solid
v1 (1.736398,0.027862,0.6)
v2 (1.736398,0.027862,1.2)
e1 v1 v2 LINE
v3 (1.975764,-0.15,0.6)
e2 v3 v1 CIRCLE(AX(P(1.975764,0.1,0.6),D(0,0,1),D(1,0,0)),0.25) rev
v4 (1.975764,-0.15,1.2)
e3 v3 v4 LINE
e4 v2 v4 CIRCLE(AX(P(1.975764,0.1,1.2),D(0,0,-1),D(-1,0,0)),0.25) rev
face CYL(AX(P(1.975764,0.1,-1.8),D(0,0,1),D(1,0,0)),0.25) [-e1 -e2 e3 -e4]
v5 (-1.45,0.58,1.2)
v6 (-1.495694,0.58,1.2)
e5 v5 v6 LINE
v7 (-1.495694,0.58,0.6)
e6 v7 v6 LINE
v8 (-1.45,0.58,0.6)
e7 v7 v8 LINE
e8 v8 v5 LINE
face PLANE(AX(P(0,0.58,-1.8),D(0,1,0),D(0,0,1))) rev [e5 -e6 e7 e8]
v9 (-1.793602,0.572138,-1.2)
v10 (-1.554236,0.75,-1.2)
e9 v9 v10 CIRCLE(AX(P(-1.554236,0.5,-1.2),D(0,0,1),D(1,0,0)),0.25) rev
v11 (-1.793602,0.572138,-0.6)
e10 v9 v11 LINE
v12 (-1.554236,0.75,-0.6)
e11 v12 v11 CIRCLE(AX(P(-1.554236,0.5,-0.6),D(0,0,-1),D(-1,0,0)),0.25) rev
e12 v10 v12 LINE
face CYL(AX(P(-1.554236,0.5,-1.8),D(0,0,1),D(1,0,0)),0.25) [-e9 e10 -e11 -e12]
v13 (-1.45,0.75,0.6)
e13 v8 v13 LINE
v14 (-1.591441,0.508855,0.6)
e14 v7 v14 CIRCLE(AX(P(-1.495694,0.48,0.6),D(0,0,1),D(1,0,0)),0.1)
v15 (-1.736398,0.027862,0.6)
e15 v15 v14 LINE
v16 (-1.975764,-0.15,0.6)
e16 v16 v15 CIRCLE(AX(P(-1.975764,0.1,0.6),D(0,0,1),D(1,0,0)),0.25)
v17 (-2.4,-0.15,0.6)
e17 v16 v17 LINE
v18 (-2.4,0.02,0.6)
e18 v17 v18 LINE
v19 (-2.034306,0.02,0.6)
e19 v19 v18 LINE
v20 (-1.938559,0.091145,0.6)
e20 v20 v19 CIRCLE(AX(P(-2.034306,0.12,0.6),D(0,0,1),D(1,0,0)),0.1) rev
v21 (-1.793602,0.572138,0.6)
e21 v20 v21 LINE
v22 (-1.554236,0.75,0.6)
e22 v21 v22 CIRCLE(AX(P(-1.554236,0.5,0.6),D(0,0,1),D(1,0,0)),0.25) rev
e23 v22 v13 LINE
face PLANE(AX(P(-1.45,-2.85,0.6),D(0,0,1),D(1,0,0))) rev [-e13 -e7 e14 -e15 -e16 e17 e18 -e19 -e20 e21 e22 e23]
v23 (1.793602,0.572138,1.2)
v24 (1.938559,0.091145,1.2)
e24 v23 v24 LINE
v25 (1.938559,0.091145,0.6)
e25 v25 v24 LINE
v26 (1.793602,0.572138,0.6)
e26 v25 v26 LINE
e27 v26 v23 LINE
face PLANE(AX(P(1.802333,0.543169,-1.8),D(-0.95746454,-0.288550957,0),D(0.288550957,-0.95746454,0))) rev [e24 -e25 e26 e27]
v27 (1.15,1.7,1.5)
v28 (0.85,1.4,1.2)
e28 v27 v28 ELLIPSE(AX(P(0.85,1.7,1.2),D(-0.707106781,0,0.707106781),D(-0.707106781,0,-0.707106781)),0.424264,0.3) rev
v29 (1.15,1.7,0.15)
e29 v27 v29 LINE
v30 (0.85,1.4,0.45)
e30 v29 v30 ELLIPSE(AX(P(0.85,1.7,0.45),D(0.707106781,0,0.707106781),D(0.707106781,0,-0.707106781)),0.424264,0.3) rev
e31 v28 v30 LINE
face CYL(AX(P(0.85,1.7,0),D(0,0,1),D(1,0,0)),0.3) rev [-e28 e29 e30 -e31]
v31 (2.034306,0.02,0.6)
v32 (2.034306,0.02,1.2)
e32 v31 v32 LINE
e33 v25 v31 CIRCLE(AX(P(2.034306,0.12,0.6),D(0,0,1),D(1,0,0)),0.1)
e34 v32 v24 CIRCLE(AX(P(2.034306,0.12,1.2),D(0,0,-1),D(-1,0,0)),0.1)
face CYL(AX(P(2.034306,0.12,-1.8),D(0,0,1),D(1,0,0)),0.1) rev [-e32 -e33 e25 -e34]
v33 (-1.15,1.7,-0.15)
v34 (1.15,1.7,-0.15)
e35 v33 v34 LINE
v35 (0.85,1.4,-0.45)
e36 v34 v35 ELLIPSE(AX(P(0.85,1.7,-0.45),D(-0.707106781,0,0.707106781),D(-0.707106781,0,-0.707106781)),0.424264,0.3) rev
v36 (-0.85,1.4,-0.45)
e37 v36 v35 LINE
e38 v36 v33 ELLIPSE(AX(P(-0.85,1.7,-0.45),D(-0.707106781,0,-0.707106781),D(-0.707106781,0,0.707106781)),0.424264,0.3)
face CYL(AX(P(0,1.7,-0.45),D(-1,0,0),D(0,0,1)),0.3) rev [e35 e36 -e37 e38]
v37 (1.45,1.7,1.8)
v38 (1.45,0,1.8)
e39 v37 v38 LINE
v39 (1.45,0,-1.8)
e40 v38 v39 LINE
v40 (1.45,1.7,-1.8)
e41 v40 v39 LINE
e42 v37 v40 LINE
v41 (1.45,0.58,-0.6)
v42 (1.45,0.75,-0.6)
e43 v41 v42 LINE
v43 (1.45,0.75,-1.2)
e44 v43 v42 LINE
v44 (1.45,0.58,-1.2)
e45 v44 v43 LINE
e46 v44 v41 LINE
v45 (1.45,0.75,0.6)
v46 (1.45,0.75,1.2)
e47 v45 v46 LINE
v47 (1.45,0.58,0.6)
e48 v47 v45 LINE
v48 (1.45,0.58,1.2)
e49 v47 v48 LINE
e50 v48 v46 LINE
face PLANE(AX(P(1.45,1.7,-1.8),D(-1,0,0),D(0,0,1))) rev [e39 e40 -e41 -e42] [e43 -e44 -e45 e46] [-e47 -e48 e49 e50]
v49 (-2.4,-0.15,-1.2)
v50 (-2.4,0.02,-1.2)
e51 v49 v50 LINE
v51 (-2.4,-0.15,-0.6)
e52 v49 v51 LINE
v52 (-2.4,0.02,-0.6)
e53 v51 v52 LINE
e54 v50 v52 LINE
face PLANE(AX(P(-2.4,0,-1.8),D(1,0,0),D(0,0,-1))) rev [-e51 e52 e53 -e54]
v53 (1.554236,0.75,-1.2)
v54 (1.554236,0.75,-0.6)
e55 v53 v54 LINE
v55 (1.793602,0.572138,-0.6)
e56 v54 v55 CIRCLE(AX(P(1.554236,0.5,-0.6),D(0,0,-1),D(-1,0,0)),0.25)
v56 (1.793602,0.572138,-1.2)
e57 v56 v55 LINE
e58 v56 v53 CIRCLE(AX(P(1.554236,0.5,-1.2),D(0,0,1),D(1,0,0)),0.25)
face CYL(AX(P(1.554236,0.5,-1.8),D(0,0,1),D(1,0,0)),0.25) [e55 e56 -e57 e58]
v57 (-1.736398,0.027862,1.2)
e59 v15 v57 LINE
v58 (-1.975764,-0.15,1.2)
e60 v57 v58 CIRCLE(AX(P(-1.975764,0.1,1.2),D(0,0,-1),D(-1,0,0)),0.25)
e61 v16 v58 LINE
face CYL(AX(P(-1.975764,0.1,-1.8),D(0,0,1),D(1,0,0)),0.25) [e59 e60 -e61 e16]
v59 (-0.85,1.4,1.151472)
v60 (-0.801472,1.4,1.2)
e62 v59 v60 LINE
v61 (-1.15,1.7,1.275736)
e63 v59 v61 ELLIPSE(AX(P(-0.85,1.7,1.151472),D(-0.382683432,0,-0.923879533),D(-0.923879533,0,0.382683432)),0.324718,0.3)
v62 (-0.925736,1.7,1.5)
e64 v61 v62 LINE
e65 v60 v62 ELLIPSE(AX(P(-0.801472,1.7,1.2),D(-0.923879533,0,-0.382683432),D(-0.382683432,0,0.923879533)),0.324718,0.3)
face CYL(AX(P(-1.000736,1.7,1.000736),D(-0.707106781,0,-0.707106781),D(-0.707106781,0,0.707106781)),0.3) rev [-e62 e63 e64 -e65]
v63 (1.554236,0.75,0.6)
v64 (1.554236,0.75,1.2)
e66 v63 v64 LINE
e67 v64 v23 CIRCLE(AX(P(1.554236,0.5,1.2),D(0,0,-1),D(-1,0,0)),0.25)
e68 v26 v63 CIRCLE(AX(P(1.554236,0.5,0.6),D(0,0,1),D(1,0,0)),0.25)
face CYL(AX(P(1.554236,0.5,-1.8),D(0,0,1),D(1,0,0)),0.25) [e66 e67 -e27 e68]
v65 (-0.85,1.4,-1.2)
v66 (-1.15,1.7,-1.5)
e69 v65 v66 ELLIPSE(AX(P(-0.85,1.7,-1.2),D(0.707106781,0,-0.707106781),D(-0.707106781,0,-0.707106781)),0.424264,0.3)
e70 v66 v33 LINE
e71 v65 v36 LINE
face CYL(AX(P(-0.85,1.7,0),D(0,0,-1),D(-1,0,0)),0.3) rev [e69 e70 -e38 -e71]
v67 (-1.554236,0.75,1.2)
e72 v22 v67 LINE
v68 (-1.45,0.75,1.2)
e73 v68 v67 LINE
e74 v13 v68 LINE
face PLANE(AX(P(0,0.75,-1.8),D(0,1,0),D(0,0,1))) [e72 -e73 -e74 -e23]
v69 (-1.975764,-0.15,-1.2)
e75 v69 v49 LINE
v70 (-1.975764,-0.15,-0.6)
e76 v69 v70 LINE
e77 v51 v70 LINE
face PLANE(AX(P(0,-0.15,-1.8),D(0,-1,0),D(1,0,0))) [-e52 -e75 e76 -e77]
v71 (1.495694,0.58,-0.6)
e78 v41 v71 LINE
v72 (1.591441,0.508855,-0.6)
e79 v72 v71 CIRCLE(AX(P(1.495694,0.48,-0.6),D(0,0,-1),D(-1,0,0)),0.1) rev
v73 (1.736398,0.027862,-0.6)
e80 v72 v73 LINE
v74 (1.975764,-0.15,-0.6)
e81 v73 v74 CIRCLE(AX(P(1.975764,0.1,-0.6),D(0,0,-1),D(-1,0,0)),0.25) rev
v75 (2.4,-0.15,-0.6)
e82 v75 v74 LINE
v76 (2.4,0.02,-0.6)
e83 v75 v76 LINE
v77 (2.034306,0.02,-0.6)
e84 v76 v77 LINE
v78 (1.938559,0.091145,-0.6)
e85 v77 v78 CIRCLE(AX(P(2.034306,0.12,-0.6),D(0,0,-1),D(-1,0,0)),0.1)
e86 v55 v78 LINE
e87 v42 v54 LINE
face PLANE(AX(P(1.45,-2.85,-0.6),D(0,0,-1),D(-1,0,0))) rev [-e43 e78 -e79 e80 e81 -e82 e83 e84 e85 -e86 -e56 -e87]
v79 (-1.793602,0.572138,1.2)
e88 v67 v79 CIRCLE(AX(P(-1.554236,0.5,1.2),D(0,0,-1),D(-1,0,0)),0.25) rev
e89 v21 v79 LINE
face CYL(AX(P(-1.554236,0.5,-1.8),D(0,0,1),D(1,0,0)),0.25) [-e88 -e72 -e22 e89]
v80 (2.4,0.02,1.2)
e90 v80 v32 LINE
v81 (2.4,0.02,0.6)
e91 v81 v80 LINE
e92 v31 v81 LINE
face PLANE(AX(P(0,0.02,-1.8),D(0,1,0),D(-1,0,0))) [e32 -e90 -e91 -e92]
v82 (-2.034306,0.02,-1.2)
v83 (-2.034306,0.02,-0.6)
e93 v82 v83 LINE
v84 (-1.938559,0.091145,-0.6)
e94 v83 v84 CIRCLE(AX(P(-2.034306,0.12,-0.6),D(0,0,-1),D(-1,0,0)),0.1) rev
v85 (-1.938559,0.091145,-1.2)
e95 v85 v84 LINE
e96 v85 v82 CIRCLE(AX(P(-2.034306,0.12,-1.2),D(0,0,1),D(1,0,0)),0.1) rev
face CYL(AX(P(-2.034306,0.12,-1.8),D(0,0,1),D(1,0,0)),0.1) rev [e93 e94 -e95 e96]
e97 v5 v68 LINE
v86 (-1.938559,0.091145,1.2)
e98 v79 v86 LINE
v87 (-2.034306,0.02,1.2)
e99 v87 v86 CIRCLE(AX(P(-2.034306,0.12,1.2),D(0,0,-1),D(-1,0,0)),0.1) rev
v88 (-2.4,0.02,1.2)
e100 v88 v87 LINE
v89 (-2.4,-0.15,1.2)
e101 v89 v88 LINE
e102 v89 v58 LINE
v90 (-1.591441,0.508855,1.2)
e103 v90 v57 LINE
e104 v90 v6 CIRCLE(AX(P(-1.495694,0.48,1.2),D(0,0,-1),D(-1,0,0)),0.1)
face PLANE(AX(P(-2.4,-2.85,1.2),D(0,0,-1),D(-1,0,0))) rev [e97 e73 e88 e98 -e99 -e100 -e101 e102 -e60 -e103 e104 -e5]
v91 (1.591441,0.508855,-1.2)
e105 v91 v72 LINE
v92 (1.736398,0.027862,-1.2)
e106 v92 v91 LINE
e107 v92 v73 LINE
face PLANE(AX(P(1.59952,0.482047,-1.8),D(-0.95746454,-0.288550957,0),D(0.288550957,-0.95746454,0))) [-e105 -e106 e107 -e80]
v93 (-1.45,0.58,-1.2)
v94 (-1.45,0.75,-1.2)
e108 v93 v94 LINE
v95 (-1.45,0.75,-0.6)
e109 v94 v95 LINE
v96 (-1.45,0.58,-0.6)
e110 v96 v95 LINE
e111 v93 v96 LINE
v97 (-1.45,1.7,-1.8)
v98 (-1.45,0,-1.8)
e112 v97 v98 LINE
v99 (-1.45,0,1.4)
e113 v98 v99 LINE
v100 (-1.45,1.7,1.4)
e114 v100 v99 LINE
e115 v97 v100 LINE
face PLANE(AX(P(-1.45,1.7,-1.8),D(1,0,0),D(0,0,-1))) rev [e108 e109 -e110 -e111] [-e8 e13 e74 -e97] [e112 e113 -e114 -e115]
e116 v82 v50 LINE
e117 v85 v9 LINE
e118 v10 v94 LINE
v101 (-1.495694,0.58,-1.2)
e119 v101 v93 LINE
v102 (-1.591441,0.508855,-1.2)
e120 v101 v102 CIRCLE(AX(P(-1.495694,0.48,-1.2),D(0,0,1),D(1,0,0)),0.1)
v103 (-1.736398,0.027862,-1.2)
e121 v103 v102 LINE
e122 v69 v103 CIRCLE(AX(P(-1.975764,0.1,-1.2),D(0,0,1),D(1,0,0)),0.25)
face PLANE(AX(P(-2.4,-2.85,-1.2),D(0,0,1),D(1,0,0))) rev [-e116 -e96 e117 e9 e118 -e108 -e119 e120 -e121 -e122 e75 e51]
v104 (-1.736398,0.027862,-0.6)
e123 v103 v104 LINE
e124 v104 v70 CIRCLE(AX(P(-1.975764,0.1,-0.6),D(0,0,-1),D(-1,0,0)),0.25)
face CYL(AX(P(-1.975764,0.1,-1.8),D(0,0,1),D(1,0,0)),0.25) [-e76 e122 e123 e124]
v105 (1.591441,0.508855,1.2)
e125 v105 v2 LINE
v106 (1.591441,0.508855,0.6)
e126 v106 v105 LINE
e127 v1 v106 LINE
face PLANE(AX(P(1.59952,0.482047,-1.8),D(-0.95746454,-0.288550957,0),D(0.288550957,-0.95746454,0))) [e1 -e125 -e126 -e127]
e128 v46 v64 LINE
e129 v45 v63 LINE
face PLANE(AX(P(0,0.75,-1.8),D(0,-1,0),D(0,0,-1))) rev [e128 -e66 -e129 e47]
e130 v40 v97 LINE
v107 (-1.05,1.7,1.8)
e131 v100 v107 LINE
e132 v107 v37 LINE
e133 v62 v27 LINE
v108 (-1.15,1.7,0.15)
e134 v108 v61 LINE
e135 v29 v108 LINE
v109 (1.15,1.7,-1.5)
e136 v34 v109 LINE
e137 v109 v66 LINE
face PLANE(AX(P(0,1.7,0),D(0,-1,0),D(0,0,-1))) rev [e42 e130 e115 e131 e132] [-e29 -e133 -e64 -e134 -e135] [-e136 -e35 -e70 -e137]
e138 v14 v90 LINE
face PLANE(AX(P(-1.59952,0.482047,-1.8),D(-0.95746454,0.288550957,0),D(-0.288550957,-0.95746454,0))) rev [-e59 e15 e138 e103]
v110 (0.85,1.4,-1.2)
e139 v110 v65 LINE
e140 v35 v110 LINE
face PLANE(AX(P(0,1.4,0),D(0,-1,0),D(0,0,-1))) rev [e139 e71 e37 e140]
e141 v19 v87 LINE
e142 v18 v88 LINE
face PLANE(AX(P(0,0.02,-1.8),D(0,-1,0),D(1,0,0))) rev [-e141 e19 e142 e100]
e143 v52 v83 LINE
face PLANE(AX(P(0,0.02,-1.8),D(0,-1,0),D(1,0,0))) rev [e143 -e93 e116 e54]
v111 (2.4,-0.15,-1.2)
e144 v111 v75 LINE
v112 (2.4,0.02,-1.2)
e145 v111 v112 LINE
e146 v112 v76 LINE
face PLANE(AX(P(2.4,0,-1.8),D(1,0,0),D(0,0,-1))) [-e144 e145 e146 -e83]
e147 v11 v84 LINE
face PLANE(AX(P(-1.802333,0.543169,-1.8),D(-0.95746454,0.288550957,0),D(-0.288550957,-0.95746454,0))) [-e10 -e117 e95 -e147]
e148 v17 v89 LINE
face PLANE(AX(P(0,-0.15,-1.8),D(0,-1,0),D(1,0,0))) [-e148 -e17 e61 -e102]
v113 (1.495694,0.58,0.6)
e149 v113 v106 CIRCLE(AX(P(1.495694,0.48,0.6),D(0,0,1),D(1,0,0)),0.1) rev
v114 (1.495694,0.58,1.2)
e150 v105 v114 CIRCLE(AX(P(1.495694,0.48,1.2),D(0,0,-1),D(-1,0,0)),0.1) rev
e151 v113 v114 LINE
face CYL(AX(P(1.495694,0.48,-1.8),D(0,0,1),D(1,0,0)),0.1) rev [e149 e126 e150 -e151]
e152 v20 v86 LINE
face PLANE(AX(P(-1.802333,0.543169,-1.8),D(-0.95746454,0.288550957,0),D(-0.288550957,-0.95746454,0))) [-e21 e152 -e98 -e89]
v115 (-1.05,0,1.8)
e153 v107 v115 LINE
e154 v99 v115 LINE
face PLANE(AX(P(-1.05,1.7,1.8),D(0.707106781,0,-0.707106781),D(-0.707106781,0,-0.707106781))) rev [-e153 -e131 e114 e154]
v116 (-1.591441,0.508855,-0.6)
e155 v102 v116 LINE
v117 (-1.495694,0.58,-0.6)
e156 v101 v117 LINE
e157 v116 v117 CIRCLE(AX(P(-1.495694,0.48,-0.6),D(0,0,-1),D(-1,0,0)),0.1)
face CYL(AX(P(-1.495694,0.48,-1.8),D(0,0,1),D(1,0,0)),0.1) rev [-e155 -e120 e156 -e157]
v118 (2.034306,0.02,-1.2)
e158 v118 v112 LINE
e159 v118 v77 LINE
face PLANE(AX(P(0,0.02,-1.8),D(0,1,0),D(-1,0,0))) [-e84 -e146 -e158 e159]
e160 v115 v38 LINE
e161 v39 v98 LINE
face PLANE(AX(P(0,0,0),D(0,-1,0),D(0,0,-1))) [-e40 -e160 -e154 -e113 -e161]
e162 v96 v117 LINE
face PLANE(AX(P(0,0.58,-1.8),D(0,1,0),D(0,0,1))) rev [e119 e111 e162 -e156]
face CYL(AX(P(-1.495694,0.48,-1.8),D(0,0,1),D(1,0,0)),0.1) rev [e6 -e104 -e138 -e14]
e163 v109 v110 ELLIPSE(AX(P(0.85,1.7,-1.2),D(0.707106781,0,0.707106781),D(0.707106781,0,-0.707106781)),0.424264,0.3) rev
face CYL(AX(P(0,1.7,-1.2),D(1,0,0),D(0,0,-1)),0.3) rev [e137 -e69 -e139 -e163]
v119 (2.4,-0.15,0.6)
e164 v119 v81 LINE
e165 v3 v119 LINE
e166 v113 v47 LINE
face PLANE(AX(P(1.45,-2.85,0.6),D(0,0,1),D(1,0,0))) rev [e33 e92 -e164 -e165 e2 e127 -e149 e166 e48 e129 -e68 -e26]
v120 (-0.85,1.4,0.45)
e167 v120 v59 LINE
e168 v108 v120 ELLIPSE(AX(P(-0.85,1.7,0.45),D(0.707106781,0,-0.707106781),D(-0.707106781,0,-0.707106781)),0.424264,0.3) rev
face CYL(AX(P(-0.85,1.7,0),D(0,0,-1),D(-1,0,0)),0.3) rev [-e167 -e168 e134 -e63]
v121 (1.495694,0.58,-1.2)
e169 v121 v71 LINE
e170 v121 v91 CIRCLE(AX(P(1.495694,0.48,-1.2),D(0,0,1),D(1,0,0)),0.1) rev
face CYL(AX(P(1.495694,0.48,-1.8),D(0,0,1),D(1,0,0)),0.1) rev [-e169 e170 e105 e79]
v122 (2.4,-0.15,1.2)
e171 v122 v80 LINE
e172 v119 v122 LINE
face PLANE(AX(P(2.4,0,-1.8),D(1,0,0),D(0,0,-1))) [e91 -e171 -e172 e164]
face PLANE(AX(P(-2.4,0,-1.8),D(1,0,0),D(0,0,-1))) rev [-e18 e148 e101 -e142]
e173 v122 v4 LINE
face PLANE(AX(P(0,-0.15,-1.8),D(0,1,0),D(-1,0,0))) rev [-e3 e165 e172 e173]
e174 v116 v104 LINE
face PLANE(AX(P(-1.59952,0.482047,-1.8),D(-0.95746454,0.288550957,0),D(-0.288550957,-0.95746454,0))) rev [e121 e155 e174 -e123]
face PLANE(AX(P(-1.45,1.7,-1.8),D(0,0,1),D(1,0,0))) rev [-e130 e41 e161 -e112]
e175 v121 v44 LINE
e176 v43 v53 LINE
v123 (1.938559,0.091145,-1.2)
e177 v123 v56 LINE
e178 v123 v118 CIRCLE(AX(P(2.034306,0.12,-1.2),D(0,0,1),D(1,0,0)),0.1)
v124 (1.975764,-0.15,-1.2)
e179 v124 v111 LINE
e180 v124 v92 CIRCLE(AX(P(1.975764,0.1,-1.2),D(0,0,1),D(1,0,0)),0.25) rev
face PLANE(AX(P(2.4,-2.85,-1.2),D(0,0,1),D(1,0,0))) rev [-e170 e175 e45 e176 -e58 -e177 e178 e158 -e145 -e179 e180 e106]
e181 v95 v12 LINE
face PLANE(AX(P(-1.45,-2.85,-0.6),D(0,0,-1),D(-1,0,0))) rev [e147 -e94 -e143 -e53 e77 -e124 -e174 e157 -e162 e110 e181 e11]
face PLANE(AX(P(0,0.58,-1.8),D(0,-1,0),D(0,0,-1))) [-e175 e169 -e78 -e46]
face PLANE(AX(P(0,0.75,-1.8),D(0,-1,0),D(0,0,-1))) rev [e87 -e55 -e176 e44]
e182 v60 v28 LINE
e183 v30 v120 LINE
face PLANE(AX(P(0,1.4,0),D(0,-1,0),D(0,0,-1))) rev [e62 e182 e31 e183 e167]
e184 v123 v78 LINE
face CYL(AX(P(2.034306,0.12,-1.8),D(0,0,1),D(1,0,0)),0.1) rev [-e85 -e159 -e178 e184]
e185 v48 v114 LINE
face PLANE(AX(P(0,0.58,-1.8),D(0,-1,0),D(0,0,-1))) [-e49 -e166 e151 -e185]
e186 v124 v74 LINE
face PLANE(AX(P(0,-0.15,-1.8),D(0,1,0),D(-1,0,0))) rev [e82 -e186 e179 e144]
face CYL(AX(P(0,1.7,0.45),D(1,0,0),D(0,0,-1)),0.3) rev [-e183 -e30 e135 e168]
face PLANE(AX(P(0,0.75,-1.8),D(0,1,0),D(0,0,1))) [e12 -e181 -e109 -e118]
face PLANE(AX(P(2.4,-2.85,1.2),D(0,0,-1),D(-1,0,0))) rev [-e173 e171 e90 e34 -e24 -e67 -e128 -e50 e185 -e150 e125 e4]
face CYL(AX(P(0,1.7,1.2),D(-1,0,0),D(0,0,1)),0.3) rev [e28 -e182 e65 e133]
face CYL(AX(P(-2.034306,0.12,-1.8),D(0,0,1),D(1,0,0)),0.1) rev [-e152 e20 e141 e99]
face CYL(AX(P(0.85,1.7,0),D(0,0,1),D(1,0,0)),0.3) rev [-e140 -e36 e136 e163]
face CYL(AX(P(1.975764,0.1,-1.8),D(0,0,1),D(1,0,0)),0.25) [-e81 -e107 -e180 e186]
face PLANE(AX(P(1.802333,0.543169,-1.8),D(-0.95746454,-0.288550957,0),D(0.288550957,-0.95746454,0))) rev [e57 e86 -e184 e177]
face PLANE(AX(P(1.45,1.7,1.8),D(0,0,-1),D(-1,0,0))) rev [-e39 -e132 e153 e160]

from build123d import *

# Parameters (mm, degrees)
EXTRUDE_1_DEPTH     = 1.7
SKETCH_2_W          = 2.3
SKETCH_2_H          = 1.35
CUT_EXTRUDE_1_DEPTH = 0.3
FILLET_1_R          = 0.3
FILLET_2_R          = 0.3
EXTRUDE_2_DEPTH     = 3.6
SKETCH_4_W          = 0.95
SKETCH_4_H          = 0.6
SKETCH_4_H_2        = 1.2
CUT_EXTRUDE_2_DEPTH = 3.6


with BuildPart() as part:
    # Эскиз1 → Бобышка-Вытянуть1 (new body)
    with BuildSketch(Plane(origin=(0, 0, 0), x_dir=(1, 0, 0), z_dir=(0, 1, 0))):
        Polygon((1.45, -1.8), (-1.05, -1.8), (-1.45, -1.4), (-1.45, 1.8), (1.45, 1.8), align=None)
    extrude(amount=EXTRUDE_1_DEPTH)

    # Эскиз2 → Вырез-Вытянуть1 (cut)
    with BuildSketch(Plane(origin=(0, 1.7, 0), x_dir=(1, 0, 0), z_dir=(0, 1, 0))):
        with Locations((0, 0.825)):
            Rectangle(SKETCH_2_W, SKETCH_2_H)
        Polygon((-1.15, -1.275735931), (-0.925735931, -1.5), (1.15, -1.5), (1.15, -0.15), (-1.15, -0.15), align=None)
    extrude(amount=-CUT_EXTRUDE_1_DEPTH, mode=Mode.SUBTRACT)

    # Скругление1
    fillet_1_edges = [part.edges().sort_by_distance(p)[0] for p in [
        (0, 1.4, -0.15),
        (-1.15, 1.4, -0.825),
        (0, 1.4, -1.5),
        (1.15, 1.4, -0.825),
    ]]
    fillet(fillet_1_edges, radius=FILLET_1_R - 0.0001)  # a hair under: the kernel refuses the full size

    # Скругление2
    fillet_2_edges = [part.edges().sort_by_distance(p)[0] for p in [
        (0.112132034, 1.4, 1.5),
        (-1.037867966, 1.4, 1.387867966),
        (-1.15, 1.4, 0.712867966),
        (0, 1.4, 0.15),
        (1.15, 1.4, 0.825),
    ]]
    fillet(fillet_2_edges, radius=FILLET_2_R - 0.0001)  # a hair under: the kernel refuses the full size

    # Эскиз3 → Бобышка-Вытянуть2 (add)
    with BuildSketch(Plane.XY.offset(1.8)):
        with BuildLine():
            ThreePointArc((-2.034305524, 0.02), (-1.974662878, 0.039733227), (-1.93855907, 0.091144904))
            Line((-1.93855907, 0.091144904), (-1.793602325, 0.572137739))
            ThreePointArc((-1.793602325, 0.572137739), (-1.703342805, 0.700666932), (-1.55423619, 0.75))
            Line((-1.55423619, 0.75), (-1.45, 0.75))
            Line((-1.45, 0.75), (-1.45, 0.58))
            Line((-1.45, 0.58), (-1.495694476, 0.58))
            ThreePointArc((-1.495694476, 0.58), (-1.555337122, 0.560266773), (-1.59144093, 0.508855096))
            Line((-1.59144093, 0.508855096), (-1.736397675, 0.027862261))
            ThreePointArc((-1.736397675, 0.027862261), (-1.826657195, -0.100666932), (-1.97576381, -0.15))
            Line((-1.97576381, -0.15), (-2.4, -0.15))
            Line((-2.4, -0.15), (-2.4, 0.02))
            Line((-2.4, 0.02), (-2.034305524, 0.02))
        make_face()
        with BuildLine():
            ThreePointArc((1.495694476, 0.58), (1.555337122, 0.560266773), (1.59144093, 0.508855096))
            Line((1.59144093, 0.508855096), (1.736397675, 0.027862261))
            ThreePointArc((1.736397675, 0.027862261), (1.826657195, -0.100666932), (1.97576381, -0.15))
            Line((1.97576381, -0.15), (2.4, -0.15))
            Line((2.4, -0.15), (2.4, 0.02))
            Line((2.4, 0.02), (2.034305524, 0.02))
            ThreePointArc((2.034305524, 0.02), (1.974662878, 0.039733227), (1.93855907, 0.091144904))
            Line((1.93855907, 0.091144904), (1.793602325, 0.572137739))
            ThreePointArc((1.793602325, 0.572137739), (1.703342805, 0.700666932), (1.55423619, 0.75))
            Line((1.55423619, 0.75), (1.45, 0.75))
            Line((1.45, 0.75), (1.45, 0.58))
            Line((1.45, 0.58), (1.495694476, 0.58))
        make_face()
    extrude(amount=-EXTRUDE_2_DEPTH)

    # Эскиз4 → Вырез-Вытянуть2 (cut)
    with BuildSketch(Plane(origin=(0, 0.75, 0), x_dir=(1, 0, 0), z_dir=(0, 1, 0))):
        with Locations((1.925, 1.5)):
            Rectangle(SKETCH_4_W, SKETCH_4_H)
        with Locations((-1.925, 1.5)):
            Rectangle(SKETCH_4_W, SKETCH_4_H)
        with Locations((1.925, 0)):
            Rectangle(SKETCH_4_W, SKETCH_4_H_2)
        with Locations((-1.925, 0)):
            Rectangle(SKETCH_4_W, SKETCH_4_H_2)
        with Locations((-1.925, -1.5)):
            Rectangle(SKETCH_4_W, SKETCH_4_H)
        with Locations((1.925, -1.5)):
            Rectangle(SKETCH_4_W, SKETCH_4_H)
    extrude(amount=-CUT_EXTRUDE_2_DEPTH, mode=Mode.SUBTRACT)


solid = part.part
